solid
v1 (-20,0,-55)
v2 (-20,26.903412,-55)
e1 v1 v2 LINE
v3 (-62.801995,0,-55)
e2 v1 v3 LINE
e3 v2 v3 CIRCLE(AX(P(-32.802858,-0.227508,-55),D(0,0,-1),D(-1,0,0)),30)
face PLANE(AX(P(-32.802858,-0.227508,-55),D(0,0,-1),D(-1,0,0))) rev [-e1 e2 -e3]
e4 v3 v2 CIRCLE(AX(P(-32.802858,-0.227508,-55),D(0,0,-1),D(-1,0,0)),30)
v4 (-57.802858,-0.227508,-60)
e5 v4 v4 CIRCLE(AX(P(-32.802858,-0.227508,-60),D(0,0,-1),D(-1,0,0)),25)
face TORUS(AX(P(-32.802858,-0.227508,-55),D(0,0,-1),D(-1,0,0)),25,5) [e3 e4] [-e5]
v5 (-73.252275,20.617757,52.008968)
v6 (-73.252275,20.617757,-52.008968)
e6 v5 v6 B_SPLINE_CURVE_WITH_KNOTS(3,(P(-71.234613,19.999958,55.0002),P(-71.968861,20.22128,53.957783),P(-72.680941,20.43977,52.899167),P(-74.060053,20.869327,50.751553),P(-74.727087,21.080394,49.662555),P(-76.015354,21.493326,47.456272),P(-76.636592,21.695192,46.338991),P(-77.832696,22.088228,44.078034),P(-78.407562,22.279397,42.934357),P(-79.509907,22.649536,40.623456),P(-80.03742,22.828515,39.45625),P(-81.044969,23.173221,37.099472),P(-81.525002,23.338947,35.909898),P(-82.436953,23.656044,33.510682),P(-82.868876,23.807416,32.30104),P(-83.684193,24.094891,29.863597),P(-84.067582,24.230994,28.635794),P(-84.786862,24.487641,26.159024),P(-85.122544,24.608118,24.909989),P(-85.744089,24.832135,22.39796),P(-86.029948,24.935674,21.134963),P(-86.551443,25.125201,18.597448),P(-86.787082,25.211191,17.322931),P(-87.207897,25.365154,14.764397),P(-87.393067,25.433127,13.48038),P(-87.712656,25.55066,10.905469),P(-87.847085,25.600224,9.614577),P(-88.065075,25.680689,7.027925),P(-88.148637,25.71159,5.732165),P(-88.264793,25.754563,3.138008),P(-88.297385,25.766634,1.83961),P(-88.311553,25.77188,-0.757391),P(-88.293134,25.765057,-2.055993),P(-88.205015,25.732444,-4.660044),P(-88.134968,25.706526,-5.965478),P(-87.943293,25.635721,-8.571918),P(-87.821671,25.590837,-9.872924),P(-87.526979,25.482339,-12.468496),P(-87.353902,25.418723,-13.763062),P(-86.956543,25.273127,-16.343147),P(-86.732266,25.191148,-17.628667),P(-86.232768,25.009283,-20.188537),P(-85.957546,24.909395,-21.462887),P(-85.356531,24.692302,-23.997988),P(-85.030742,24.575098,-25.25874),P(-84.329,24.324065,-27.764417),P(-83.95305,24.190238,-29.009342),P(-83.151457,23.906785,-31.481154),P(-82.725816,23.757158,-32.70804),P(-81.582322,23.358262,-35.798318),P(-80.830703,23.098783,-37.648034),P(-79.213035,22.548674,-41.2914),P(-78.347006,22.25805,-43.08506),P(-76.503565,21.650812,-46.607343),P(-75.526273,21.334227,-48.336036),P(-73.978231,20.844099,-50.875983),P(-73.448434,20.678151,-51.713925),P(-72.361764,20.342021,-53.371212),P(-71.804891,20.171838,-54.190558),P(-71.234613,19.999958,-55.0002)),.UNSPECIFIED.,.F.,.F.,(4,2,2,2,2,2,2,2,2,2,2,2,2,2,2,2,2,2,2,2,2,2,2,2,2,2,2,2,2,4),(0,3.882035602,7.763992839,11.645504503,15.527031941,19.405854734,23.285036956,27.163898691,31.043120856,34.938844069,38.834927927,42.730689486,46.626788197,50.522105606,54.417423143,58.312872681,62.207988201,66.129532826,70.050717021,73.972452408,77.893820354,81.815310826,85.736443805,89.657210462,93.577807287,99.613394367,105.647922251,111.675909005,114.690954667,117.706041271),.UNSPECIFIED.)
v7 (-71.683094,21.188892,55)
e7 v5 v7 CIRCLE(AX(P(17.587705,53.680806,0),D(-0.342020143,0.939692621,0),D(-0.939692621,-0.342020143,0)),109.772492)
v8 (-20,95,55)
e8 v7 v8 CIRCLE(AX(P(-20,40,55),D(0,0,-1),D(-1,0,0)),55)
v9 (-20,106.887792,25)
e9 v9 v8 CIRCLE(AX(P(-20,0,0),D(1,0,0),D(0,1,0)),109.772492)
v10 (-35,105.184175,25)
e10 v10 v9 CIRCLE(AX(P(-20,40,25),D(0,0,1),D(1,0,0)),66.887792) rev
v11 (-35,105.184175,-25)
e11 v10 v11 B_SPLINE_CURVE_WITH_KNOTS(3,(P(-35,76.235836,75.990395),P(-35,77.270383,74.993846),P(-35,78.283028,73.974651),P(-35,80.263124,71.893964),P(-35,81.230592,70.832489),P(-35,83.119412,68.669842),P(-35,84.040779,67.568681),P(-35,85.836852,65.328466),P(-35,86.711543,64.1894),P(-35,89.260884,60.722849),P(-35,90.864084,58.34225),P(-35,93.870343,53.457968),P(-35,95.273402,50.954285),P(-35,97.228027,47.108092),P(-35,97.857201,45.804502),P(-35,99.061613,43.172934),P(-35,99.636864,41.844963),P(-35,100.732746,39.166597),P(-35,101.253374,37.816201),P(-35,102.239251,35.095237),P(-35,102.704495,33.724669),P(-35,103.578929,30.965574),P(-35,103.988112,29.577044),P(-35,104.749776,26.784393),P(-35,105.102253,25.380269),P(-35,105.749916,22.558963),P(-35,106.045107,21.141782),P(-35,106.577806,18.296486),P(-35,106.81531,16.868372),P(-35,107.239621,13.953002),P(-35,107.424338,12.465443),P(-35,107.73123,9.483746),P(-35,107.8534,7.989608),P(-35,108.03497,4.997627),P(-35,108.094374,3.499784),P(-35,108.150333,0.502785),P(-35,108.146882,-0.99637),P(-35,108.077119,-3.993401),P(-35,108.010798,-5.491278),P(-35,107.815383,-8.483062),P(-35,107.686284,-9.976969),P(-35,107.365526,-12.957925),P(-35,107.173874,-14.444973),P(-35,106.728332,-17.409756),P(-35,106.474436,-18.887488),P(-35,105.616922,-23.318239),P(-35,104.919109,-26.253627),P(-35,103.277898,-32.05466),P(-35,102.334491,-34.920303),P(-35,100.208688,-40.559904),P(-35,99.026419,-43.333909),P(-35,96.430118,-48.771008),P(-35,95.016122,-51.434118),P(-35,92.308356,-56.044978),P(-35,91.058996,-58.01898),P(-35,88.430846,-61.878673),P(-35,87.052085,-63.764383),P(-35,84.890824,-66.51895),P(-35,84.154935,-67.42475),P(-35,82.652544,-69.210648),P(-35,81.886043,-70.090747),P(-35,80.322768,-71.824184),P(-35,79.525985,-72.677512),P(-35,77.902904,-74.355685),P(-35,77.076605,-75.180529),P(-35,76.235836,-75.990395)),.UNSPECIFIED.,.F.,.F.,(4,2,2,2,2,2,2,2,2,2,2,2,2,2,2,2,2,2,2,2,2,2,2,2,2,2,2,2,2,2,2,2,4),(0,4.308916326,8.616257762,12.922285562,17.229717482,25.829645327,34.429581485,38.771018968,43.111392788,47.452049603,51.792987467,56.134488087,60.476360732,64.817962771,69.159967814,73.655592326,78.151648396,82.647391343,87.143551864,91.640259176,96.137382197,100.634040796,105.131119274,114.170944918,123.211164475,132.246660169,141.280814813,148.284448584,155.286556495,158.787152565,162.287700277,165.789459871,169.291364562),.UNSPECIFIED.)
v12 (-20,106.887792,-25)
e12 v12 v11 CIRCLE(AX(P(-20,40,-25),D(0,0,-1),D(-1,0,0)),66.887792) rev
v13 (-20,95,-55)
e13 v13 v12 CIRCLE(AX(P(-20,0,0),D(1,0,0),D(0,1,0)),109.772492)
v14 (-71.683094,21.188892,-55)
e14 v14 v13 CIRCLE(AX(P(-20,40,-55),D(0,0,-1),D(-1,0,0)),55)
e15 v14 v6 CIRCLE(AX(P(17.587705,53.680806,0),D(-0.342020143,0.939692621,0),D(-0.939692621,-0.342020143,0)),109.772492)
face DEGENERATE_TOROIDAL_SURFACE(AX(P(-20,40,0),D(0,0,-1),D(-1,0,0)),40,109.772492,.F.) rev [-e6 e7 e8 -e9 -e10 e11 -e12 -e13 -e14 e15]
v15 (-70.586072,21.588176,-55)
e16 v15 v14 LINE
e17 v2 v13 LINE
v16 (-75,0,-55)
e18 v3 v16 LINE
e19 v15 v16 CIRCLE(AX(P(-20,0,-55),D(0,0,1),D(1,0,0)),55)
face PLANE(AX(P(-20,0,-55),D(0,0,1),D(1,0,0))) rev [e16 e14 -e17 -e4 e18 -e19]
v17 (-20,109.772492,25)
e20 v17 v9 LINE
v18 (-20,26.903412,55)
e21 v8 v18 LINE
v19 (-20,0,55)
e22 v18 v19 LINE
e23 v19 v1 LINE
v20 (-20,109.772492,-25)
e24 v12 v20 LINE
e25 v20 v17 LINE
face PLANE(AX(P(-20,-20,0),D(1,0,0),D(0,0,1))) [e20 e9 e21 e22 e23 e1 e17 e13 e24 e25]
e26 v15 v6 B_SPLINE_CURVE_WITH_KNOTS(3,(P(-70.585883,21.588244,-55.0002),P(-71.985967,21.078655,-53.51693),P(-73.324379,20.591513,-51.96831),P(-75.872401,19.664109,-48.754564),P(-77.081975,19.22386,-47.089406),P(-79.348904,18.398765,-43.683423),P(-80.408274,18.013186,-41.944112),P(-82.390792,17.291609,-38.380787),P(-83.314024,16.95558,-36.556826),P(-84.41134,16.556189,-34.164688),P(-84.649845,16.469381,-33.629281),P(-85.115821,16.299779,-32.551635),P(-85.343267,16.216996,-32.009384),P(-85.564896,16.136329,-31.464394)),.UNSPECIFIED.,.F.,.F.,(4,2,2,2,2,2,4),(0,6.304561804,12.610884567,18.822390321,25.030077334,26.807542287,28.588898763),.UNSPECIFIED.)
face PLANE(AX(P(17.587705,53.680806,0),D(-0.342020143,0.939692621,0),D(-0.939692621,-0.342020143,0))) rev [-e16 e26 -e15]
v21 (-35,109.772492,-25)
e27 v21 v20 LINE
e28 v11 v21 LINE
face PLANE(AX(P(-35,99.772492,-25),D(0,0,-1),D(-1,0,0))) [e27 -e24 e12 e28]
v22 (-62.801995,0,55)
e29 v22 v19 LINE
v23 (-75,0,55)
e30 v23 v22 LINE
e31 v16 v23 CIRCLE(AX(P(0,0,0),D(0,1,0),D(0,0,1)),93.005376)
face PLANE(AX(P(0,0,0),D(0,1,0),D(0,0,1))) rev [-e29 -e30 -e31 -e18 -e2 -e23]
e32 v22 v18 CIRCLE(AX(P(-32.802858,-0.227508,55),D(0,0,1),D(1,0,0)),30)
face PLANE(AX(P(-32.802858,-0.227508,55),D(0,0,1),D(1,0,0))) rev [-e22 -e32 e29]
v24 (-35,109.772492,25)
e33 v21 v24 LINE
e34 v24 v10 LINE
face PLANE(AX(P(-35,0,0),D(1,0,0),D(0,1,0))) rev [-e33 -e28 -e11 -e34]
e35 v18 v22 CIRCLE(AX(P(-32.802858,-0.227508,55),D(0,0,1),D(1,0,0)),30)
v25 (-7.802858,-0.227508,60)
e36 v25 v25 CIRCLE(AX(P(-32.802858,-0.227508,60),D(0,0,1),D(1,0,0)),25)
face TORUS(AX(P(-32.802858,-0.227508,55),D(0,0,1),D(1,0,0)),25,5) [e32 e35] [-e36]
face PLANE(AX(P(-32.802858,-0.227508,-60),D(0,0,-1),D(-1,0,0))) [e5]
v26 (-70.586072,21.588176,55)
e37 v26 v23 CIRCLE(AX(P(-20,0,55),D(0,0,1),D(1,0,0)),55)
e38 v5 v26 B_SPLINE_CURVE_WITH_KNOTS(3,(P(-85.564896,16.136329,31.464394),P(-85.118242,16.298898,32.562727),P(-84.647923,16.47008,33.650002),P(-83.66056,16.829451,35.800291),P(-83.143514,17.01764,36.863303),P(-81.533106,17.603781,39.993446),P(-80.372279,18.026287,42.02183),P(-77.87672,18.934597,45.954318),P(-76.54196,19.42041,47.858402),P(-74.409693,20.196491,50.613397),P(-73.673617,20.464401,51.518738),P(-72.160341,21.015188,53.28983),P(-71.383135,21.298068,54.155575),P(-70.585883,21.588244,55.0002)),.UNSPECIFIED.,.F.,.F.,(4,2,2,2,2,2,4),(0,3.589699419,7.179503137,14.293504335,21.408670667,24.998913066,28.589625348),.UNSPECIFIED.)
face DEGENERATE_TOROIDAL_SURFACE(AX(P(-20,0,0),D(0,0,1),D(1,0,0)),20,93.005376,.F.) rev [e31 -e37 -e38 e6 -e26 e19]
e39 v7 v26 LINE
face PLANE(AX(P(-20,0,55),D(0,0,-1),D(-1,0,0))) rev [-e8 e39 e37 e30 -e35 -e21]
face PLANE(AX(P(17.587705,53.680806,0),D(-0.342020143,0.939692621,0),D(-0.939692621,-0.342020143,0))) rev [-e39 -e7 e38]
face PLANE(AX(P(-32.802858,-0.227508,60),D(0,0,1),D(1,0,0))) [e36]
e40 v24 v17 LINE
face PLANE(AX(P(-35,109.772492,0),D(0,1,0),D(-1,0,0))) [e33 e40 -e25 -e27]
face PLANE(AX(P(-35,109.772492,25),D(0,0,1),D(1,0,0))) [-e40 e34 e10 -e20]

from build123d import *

# Parameters (mm, degrees)
OBR_T1_ANGLE                = 90
OBR_T2_ANGLE                = 110
DODANIE_WYCI_GNI_CIE1_DEPTH = 15
SZKIC5_R                    = 30
DODANIE_WYCI_GNI_CIE2_DEPTH = 5
ZAOKR_GLENIE1_R             = 5
DODANIE_WYCI_GNI_CIE3_START = 5
SZKIC6_R                    = 30
DODANIE_WYCI_GNI_CIE3_DEPTH = 5
ZAOKR_GLENIE2_R             = 5


with BuildPart() as part:
    # Szkic1 → Obrót1 (revolve)
    with BuildSketch(Plane(origin=(0, 0, 0), x_dir=(1, 0, 0), z_dir=(0, 1, 0))):
        with BuildLine():
            Line((-20, -55), (-20, 55))
            Line((-20, 55), (-75, 55))
            ThreePointArc((-75, 55), (-93.005376189, 0), (-75, -55))
            Line((-75, -55), (-20, -55))
        make_face()
    revolve(axis=Axis((-20, 0, 55), (0, 0, -1)), revolution_arc=OBR_T1_ANGLE)

    # Szkic2 → Obrót2 (revolve)
    with BuildSketch(Plane(origin=(-20, 0, 0), x_dir=(0, 0, -1), z_dir=(1, 0, 0))):
        with BuildLine():
            Line((-55, 55), (-55, 40))
            Line((-55, 40), (55, 40))
            Line((55, 40), (55, 55))
            Line((55, 55), (55, 95))
            ThreePointArc((55, 95), (0, 109.772492001), (-55, 95))
            Line((-55, 95), (-55, 55))
        make_face()
    revolve(axis=Axis((-20, 40, 55), (0, 0, 1)), revolution_arc=OBR_T2_ANGLE)

    # Szkic3 → Dodanie-wyciągnięcie1 (add)
    with BuildSketch(Plane(origin=(-20, 0, 0), x_dir=(0, 0, -1), z_dir=(1, 0, 0))):
        Polygon((0, 109.772492001), (-25, 109.772492001), (-25, 99.772492001), (25, 99.772492001), (25, 109.772492001), align=None)
    extrude(amount=-DODANIE_WYCI_GNI_CIE1_DEPTH)

    # Szkic5 → Dodanie-wyciągnięcie2 (add)
    with BuildSketch(Plane.XY.offset(55)):
        with Locations(Location((-32.802857824, -0.227507999, 0), (0, 0, 179.565487562))):
            Circle(SZKIC5_R)
    extrude(amount=DODANIE_WYCI_GNI_CIE2_DEPTH)

    # Zaokrąglenie1
    zaokr_glenie1_edges = [part.edges().sort_by_distance(p)[0] for p in [
        (-2.803720502, -0.455015999, 60),
    ]]
    fillet(zaokr_glenie1_edges, radius=ZAOKR_GLENIE1_R - 0.0001)  # a hair under: the kernel refuses the full size

    # Szkic6 → Dodanie-wyciągnięcie3 (add)
    with BuildSketch(Plane(origin=(0, 0, -55), x_dir=(-1, 0, 0), z_dir=(0, 0, -1)).offset(DODANIE_WYCI_GNI_CIE3_START)):
        with Locations(Location((32.802857824, -0.227507999, 0), (0, 0, 115.262238739))):
            Circle(SZKIC6_R)
    extrude(amount=-DODANIE_WYCI_GNI_CIE3_DEPTH)

    # Zaokrąglenie2
    zaokr_glenie2_edges = [part.edges().sort_by_distance(p)[0] for p in [
        (-45.605715649, -27.358428211, -60),
    ]]
    fillet(zaokr_glenie2_edges, radius=ZAOKR_GLENIE2_R - 0.0001)  # a hair under: the kernel refuses the full size


solid = part.part
